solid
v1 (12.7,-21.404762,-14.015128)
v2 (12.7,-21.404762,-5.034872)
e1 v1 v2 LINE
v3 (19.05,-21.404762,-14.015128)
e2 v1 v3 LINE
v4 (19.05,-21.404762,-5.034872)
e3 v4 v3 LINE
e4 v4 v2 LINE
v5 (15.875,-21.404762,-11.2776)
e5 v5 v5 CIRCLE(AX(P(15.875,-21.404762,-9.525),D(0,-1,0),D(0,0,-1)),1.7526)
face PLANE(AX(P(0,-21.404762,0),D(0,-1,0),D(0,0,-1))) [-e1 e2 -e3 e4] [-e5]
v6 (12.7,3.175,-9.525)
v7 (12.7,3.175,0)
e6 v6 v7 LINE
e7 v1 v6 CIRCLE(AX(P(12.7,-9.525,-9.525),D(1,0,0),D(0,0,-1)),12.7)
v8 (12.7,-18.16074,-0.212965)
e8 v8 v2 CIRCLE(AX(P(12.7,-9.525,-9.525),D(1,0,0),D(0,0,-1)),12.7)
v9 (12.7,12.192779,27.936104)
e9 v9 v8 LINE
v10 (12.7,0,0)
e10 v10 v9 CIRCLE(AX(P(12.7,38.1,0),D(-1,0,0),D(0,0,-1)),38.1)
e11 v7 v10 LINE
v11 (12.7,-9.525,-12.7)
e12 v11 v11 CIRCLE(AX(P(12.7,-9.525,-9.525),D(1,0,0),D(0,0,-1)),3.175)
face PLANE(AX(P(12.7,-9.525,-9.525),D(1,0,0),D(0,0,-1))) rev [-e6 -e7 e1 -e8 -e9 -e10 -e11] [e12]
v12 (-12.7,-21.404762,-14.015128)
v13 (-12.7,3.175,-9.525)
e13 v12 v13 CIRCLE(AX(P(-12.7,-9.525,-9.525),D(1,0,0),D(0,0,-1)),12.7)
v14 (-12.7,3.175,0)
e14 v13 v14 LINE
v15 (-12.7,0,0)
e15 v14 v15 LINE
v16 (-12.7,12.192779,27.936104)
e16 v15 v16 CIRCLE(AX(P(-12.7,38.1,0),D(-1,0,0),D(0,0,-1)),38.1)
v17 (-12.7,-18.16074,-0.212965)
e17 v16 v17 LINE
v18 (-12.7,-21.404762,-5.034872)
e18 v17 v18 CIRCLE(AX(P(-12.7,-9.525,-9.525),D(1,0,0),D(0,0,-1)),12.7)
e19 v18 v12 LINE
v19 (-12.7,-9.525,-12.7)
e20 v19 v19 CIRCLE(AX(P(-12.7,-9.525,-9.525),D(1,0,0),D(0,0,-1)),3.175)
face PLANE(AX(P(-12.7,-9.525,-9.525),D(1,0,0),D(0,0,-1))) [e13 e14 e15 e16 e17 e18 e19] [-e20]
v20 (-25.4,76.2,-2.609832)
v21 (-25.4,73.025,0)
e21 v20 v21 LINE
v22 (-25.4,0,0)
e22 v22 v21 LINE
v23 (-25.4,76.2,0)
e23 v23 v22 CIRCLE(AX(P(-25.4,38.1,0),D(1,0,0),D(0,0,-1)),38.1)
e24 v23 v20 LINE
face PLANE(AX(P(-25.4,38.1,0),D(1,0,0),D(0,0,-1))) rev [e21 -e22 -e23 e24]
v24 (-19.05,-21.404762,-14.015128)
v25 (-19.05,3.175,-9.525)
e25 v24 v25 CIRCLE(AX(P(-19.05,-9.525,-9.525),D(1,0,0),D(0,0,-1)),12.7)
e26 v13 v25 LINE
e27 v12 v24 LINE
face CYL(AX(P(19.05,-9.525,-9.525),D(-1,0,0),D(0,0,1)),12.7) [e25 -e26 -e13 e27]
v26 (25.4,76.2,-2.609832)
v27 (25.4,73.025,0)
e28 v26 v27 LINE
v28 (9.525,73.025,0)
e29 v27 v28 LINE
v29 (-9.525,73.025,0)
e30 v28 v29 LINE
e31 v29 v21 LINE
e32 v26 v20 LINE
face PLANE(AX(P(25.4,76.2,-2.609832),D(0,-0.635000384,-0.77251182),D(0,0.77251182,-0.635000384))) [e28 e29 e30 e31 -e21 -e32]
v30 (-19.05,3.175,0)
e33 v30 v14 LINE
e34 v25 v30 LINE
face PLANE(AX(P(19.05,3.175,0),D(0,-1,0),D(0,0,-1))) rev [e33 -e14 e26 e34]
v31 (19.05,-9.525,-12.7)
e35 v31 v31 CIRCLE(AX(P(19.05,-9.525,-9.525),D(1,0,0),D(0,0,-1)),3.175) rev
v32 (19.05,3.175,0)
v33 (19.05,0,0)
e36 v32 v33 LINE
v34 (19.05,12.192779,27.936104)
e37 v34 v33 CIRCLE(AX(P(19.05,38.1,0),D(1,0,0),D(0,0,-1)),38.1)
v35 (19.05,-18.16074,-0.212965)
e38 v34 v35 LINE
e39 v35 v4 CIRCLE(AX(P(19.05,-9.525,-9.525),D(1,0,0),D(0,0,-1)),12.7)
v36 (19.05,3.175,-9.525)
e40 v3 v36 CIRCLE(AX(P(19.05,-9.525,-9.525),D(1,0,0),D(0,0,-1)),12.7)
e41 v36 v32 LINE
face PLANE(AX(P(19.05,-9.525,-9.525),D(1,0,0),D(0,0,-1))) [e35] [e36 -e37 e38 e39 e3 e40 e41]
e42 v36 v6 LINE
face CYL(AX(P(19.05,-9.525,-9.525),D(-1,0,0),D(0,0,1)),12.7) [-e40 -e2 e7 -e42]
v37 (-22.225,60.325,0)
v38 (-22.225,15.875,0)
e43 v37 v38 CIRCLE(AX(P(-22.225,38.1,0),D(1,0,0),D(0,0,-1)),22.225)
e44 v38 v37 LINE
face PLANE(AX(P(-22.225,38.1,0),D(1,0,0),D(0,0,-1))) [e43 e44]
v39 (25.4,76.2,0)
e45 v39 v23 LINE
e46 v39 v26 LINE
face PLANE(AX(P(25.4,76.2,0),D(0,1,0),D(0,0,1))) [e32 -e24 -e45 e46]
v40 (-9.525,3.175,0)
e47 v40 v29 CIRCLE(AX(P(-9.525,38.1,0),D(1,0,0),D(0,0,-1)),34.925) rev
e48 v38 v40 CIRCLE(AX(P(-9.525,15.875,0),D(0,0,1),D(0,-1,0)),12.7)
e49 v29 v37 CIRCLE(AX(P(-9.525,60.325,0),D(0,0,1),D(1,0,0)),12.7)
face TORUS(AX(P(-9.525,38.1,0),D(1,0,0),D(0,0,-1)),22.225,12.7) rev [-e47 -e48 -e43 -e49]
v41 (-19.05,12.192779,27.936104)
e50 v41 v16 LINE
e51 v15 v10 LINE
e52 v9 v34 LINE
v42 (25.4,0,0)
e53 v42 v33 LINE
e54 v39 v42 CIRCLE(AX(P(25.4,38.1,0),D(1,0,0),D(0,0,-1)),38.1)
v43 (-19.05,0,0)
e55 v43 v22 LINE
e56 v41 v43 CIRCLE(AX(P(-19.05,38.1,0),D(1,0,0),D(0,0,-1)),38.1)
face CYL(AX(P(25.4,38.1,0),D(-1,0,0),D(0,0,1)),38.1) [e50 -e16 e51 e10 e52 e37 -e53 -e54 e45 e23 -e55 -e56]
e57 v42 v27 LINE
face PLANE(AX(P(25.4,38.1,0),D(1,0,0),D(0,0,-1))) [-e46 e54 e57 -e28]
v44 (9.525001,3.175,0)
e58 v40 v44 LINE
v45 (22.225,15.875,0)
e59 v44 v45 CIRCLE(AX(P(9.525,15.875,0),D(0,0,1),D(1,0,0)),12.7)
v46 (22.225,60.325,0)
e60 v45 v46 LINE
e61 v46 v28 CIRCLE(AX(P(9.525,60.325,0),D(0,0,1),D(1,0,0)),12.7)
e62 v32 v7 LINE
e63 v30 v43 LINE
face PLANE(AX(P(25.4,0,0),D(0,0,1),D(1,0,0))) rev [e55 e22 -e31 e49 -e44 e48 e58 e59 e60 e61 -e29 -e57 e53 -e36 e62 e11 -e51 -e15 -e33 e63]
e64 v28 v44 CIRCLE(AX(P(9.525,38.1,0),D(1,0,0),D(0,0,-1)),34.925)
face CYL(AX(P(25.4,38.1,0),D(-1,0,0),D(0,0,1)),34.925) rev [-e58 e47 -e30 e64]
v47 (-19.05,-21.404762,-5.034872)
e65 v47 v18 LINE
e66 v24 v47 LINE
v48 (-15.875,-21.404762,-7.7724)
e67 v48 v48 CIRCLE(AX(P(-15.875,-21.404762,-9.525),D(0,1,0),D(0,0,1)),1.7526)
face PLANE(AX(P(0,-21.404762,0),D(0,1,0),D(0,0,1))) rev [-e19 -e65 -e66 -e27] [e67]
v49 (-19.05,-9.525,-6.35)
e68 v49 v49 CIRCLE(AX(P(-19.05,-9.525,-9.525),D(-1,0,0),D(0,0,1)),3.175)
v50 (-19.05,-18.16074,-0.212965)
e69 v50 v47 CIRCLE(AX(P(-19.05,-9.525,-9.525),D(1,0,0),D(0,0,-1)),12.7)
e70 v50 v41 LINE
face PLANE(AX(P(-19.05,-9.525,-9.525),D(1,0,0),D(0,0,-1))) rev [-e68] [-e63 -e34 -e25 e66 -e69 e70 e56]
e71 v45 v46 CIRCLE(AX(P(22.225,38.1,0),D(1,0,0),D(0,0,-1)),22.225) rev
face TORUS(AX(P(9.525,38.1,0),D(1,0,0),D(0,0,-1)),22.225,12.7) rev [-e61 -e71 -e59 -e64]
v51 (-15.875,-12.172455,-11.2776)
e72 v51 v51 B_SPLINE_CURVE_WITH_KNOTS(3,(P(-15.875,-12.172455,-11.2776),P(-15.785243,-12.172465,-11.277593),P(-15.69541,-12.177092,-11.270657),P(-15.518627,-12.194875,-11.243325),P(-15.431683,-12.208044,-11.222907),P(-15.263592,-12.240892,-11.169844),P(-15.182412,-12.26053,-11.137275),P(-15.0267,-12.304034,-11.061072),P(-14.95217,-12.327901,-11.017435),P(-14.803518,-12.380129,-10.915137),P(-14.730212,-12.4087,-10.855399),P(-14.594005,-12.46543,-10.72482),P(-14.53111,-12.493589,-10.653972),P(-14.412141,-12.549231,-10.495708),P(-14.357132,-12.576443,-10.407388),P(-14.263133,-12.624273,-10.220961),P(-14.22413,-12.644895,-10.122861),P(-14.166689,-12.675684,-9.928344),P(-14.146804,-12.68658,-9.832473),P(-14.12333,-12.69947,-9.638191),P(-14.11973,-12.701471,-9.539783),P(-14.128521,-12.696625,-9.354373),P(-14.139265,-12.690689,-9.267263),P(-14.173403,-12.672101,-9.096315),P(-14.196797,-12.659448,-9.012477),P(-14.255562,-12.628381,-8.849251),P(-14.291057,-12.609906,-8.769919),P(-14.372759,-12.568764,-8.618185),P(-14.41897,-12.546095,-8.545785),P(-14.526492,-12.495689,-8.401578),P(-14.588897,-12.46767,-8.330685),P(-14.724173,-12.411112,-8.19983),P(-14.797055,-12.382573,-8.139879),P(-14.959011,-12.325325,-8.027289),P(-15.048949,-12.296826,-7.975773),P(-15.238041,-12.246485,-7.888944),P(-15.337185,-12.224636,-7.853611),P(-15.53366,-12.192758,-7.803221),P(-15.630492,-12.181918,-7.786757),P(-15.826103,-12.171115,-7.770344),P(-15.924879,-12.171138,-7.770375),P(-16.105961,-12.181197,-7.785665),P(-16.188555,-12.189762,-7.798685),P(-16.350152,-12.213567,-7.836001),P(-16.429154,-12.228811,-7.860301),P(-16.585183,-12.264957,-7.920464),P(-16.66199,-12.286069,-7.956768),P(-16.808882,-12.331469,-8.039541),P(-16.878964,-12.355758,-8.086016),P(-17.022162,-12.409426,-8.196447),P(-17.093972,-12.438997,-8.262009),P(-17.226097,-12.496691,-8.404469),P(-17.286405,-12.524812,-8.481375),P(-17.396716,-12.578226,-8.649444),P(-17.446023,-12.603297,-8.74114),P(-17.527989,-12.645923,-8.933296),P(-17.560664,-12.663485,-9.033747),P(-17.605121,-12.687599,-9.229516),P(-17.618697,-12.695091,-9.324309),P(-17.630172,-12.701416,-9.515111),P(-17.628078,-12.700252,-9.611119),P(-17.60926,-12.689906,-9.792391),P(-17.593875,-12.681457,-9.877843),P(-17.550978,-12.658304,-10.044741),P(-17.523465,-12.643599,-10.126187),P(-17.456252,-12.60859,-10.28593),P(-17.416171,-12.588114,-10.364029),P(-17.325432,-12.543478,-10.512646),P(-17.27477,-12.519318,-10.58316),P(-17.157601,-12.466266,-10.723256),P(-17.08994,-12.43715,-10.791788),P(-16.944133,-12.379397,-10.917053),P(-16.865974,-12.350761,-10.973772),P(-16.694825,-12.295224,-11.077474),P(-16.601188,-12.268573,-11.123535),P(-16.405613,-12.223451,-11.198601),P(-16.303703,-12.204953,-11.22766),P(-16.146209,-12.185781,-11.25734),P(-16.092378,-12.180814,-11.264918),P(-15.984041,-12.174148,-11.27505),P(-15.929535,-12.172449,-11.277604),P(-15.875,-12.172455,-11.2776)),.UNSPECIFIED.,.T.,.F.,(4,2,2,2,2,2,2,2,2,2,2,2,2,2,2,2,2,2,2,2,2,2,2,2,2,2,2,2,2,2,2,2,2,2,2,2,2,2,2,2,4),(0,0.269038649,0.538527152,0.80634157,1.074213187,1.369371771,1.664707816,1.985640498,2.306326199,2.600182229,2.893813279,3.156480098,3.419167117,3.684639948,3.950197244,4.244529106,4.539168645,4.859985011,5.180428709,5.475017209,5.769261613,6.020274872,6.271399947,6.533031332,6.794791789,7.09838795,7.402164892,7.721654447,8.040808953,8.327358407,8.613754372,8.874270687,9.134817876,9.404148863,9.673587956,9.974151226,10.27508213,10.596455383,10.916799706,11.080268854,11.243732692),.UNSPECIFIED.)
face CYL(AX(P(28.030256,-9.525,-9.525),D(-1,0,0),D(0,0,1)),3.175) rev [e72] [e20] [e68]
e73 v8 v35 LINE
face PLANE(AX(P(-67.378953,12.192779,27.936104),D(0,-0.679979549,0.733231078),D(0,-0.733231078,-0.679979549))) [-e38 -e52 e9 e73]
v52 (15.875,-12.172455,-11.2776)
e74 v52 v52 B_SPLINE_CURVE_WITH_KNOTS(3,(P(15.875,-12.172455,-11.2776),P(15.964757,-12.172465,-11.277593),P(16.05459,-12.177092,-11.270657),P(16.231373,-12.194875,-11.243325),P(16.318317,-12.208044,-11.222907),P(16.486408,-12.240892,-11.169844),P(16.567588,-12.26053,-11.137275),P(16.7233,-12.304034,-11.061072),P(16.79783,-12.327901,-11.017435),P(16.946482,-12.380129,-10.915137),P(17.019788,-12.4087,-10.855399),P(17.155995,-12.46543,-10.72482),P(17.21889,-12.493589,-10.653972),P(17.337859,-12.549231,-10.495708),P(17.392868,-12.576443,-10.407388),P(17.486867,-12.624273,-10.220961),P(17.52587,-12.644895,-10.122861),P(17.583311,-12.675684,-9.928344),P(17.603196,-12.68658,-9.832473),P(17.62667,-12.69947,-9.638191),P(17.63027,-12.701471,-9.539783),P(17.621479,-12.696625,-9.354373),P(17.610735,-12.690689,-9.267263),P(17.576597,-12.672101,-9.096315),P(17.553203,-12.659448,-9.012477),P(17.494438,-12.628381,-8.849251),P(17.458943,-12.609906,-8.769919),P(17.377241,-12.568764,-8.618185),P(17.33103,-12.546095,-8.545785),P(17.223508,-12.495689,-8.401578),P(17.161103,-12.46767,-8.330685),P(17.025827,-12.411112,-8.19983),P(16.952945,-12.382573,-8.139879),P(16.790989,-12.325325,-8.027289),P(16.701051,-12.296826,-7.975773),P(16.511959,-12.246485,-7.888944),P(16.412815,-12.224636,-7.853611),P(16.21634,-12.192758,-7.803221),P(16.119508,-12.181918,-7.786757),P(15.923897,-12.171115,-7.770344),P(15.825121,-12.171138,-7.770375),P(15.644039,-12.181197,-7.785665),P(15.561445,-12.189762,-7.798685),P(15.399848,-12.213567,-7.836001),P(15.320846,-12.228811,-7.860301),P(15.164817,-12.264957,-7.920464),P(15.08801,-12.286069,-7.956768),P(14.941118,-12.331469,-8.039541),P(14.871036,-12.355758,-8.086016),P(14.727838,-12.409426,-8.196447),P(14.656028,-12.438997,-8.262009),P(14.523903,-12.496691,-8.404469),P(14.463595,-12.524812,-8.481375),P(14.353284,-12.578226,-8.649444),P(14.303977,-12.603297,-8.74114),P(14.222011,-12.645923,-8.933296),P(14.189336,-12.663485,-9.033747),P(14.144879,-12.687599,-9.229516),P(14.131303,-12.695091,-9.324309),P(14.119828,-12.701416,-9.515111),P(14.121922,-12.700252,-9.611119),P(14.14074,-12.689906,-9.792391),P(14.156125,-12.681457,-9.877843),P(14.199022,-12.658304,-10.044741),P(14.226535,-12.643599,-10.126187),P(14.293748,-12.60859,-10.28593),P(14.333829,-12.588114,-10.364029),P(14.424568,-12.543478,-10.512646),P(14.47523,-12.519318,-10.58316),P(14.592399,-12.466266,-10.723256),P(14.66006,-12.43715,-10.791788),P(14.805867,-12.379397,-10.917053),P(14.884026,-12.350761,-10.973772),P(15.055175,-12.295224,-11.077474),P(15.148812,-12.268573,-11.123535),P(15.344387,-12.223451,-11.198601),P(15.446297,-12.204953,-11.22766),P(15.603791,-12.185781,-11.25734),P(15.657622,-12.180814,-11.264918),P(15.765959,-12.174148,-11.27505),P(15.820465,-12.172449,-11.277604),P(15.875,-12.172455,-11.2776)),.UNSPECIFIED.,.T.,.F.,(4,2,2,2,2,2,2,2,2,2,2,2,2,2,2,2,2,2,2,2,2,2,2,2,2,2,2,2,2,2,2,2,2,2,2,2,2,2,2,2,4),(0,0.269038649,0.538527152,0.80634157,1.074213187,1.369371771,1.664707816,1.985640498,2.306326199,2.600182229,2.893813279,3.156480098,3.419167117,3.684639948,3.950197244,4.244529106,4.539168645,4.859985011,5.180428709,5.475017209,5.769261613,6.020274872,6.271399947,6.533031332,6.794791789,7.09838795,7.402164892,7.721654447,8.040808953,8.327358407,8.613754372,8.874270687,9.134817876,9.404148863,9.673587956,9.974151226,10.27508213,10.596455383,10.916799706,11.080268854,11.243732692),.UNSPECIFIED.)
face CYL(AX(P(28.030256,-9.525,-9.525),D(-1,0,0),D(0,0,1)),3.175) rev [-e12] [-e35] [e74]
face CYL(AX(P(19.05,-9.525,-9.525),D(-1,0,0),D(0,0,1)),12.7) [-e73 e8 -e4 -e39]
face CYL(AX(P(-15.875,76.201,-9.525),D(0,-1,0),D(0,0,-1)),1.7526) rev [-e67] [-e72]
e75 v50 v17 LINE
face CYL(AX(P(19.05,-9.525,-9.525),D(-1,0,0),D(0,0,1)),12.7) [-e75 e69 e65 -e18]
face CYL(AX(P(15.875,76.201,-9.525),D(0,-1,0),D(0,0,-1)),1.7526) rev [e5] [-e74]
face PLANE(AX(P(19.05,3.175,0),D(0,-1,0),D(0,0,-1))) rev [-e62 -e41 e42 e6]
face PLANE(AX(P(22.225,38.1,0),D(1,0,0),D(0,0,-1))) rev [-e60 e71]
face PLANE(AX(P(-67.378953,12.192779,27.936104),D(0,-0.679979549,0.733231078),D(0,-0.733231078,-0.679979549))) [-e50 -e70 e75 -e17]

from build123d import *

# Parameters (mm, degrees)
BOSS_EXTRUDE1_DEPTH                 = 25.4
SHELL1_T                            = -3.175
SKETCH4_R                           = 12.7
BOSS_EXTRUDE3_DEPTH                 = 19.05
BOSS_EXTRUDE4_DEPTH                 = 19.05
SKETCH6_R                           = 12.7
CUT_EXTRUDE2_DEPTH                  = 12.7
CUT_EXTRUDE3_START                  = 12.7
SKETCH6_2_R                         = 12.7
CUT_EXTRUDE3_DEPTH                  = 12.7
CUT_EXTRUDE4_REACH                  = 98.093
SKETCH7_R                           = 3.175
BOSS_EXTRUDE5_REACH                 = 98.093
CUT_EXTRUDE5_DEPTH                  = 12.7
BOSS_EXTRUDE6_DEPTH                 = 25.4
FILLET2_R                           = 12.7
CUT_EXTRUDE6_REACH                  = 109.812
CUT_EXTRUDE6_END_RADIUS             = 3.175
SKETCH12_R                          = 1.7526
CUT_EXTRUDE6_DIRECTION_2_REACH      = 109.812
CUT_EXTRUDE6_DIRECTION_2_END_RADIUS = 12.7
CUT_EXTRUDE7_DEPTH                  = 108.812149615


with BuildPart() as part:
    # Sketch2 → Boss-Extrude1 (new, symmetric)
    with BuildSketch(Plane(origin=(0, 0, 0), x_dir=(0, 0, -1), z_dir=(1, 0, 0))):
        with BuildLine():
            Line((0, 0), (0, 76.2))
            ThreePointArc((0, 76.2), (-38.1, 38.1), (0, 0))
        make_face()
    extrude(amount=BOSS_EXTRUDE1_DEPTH, both=True)

    # Shell1
    shell1_openings = [part.faces().sort_by_distance(p)[0] for p in [
        (0, 38.1, 0),
    ]]
    offset(amount=SHELL1_T, openings=shell1_openings)



with BuildPart() as body_2:
    # Sketch4 → Boss-Extrude3 (new, symmetric)
    with BuildSketch(Plane(origin=(0, 0, 0), x_dir=(0, 0, -1), z_dir=(1, 0, 0))):
        with Locations(Location((9.525, -9.525, 0), (0, 0, 180))):
            Circle(SKETCH4_R)
    extrude(amount=BOSS_EXTRUDE3_DEPTH, both=True)


with BuildPart() as part_1:
    add(part.part)

    add(body_2.part)  # Boss-Extrude4 merges body 2
    # Sketch5 → Boss-Extrude4 (add, symmetric)
    with BuildSketch(Plane(origin=(0, 0, 0), x_dir=(0, 0, -1), z_dir=(1, 0, 0))):
        with BuildLine():
            Line((0, 3.175), (0, 0))
            Line((0, 0), (1.124739587, 0))
            ThreePointArc((1.124739587, 0), (5.034871939, 2.354762203), (9.525, 3.175))
            Line((9.525, 3.175), (0, 3.175))
        make_face()
    extrude(amount=BOSS_EXTRUDE4_DEPTH, both=True)

    # Sketch6 → Cut-Extrude2 (cut)
    with BuildSketch(Plane(origin=(0, 0, 0), x_dir=(0, 0, -1), z_dir=(1, 0, 0))):
        with Locations((9.525, -9.525)):
            Circle(SKETCH6_R)
    extrude(amount=-CUT_EXTRUDE2_DEPTH, mode=Mode.SUBTRACT)

    # Sketch6<2> → Cut-Extrude3 (cut)
    with BuildSketch(Plane(origin=(0, 0, 0), x_dir=(0, 0, -1), z_dir=(1, 0, 0)).offset(CUT_EXTRUDE3_START)):
        with Locations((9.525, -9.525)):
            Circle(SKETCH6_2_R)
    extrude(amount=-CUT_EXTRUDE3_DEPTH, mode=Mode.SUBTRACT)

    # Cut-Extrude4: up to this face of the body (flat: up to its plane)
    cut_extrude4_end = Plane(part_1.part.faces().sort_by_distance((25.4, 38.1, 16.170142218))[0])
    # Sketch7 → Cut-Extrude4 (cut, up to the picked face)
    with BuildSketch(Plane.ZY.offset(19.05), mode=Mode.PRIVATE) as cut_extrude4_sk1:
        with Locations(Location((-9.525, -9.525, 0), (0, 0, 180))):
            Circle(SKETCH7_R)
    cut_extrude4_tool1 = split(extrude(cut_extrude4_sk1.sketch, amount=-CUT_EXTRUDE4_REACH, mode=Mode.PRIVATE), bisect_by=cut_extrude4_end, keep=Keep.BOTH, mode=Mode.PRIVATE)
    add(cut_extrude4_tool1.solids().sort_by(Axis((-19.05, -9.525, -9.525), (1, 0, 0)))[0], mode=Mode.SUBTRACT)

    # Boss-Extrude5: up to this face of the body (flat: up to its plane)
    boss_extrude5_end = Plane(part_1.part.faces().sort_by_distance((-19.05, 2.815789755, -4.7625))[0])
    # Sketch8 → Boss-Extrude5 (add, up to the picked face)
    with BuildSketch(Plane(origin=(19.05, 0, 0), x_dir=(0, 0, -1), z_dir=(1, 0, 0)), mode=Mode.PRIVATE) as boss_extrude5_sk1:
        with BuildLine():
            Line((-27.936104056, 12.192779189), (0.212965315, -18.16074027))
            Line((0.212965315, -18.16074027), (5.034871939, -21.404762203))
            Line((5.034871939, -21.404762203), (1.124739587, 0))
            Line((1.124739587, 0), (0, 3.175))
            ThreePointArc((0, 3.175), (-13.704863106, 5.9762961), (-25.211222013, 13.9308066))
            Line((-25.211222013, 13.9308066), (-27.936104056, 12.192779189))
        make_face()
    boss_extrude5_tool1 = split(extrude(boss_extrude5_sk1.sketch, amount=-BOSS_EXTRUDE5_REACH, mode=Mode.PRIVATE), bisect_by=boss_extrude5_end, keep=Keep.BOTH, mode=Mode.PRIVATE)
    add(boss_extrude5_tool1.solids().sort_by(Axis((19.05, -2.840531, 7.724646), (-1, 0, 0)))[0])

    # Sketch9 → Cut-Extrude5 (cut, symmetric)
    with BuildSketch(Plane(origin=(0, 0, 0), x_dir=(0, 0, -1), z_dir=(1, 0, 0))):
        with BuildLine():
            Line((0, 3.175), (0, 0))
            ThreePointArc((0, 0), (-15.240486985, 3.180985746), (-27.936104056, 12.192779189))
            Line((-27.936104056, 12.192779189), (0.212965315, -18.16074027))
            ThreePointArc((0.212965315, -18.16074027), (21.164671418, -14.605162328), (9.525, 3.175))
            Line((9.525, 3.175), (0, 3.175))
        make_face()
    extrude(amount=CUT_EXTRUDE5_DEPTH, both=True, mode=Mode.SUBTRACT)

    # Sketch11 → Boss-Extrude6 (add, symmetric)
    with BuildSketch(Plane(origin=(0, 0, 0), x_dir=(0, 0, -1), z_dir=(1, 0, 0))):
        Polygon((2.609832197, 76.2), (0, 76.2), (0, 73.025), align=None)
    extrude(amount=BOSS_EXTRUDE6_DEPTH, both=True)

    # Fillet2
    # the kernel refuses this fillet: 12.7 mm, written as the material it adds along each edge
    with BuildSketch(Plane(origin=(-22.225, 38.1, 0), x_dir=(0, 1, 0), z_dir=(0, 0, -1))) as fillet2_piece_1:
        with BuildLine():
            CenterArc((34.925 - FILLET2_R, FILLET2_R), FILLET2_R, 270, 90)
            Line((34.925 - FILLET2_R, 0), (34.925, 0))
            Line((34.925, 0), (34.925, FILLET2_R))
        make_face()
    revolve(axis=Axis((-22.225, 38.1, 0), (1, 0, 0)), revolution_arc=180)
    with BuildSketch(Plane(origin=(22.225, 38.1, 0), x_dir=(0, 1, 0), z_dir=(0, 0, -1))) as fillet2_piece_2:
        with BuildLine():
            CenterArc((34.925 - FILLET2_R, -FILLET2_R), FILLET2_R, 0, 90)
            Line((34.925 - FILLET2_R, 0), (34.925, 0))
            Line((34.925, 0), (34.925, -FILLET2_R))
        make_face()
    revolve(axis=Axis((22.225, 38.1, 0), (1, 0, 0)), revolution_arc=180)

    # Cut-Extrude6: up to this cylinder (the profile starts outside it)
    cut_extrude6_end = Plane(origin=(0, -9.525, -9.525), z_dir=(-1, 0, 0)) * Cylinder(CUT_EXTRUDE6_END_RADIUS, 258.724, mode=Mode.PRIVATE)
    # Sketch12 → Cut-Extrude6 (cut, up to the surface)
    with BuildSketch(Plane(origin=(0, -21.404762203, 0), x_dir=(1, 0, 0), z_dir=(0, 1, 0)), mode=Mode.PRIVATE) as cut_extrude6_sk1:
        with Locations(Location((15.875, 9.525, 0), (0, 0, 90))):
            Circle(SKETCH12_R)
    cut_extrude6_tool1 = extrude(cut_extrude6_sk1.sketch, amount=CUT_EXTRUDE6_REACH, mode=Mode.PRIVATE) - cut_extrude6_end
    add(cut_extrude6_tool1.solids().sort_by_distance((15.875, -21.404762, -9.525))[0], mode=Mode.SUBTRACT)
    # Sketch12 → Cut-Extrude6 (cut, up to the surface)
    with BuildSketch(Plane(origin=(0, -21.404762203, 0), x_dir=(1, 0, 0), z_dir=(0, 1, 0)), mode=Mode.PRIVATE) as cut_extrude6_sk2:
        with Locations(Location((-15.875, 9.525, 0), (0, 0, 90))):
            Circle(SKETCH12_R)
    cut_extrude6_tool2 = extrude(cut_extrude6_sk2.sketch, amount=CUT_EXTRUDE6_REACH, mode=Mode.PRIVATE) - cut_extrude6_end
    add(cut_extrude6_tool2.solids().sort_by_distance((-15.875, -21.404762, -9.525))[0], mode=Mode.SUBTRACT)

    # Cut-Extrude6 direction 2: up to this cylinder (the profile starts inside it)
    cut_extrude6_direction_2_end = Plane(origin=(0, -9.525, -9.525), z_dir=(-1, 0, 0)) * Cylinder(CUT_EXTRUDE6_DIRECTION_2_END_RADIUS, 277.774, mode=Mode.PRIVATE)
    # Sketch12 → Cut-Extrude6 direction 2 (cut, up to the surface)
    with BuildSketch(Plane(origin=(0, -21.404762203, 0), x_dir=(1, 0, 0), z_dir=(0, 1, 0)), mode=Mode.PRIVATE) as cut_extrude6_direction_2_sk1:
        with Locations(Location((15.875, 9.525, 0), (0, 0, 90))):
            Circle(SKETCH12_R)
    cut_extrude6_direction_2_tool1 = extrude(cut_extrude6_direction_2_sk1.sketch, amount=-CUT_EXTRUDE6_DIRECTION_2_REACH, mode=Mode.PRIVATE) & cut_extrude6_direction_2_end
    add(cut_extrude6_direction_2_tool1.solids().sort_by_distance((15.875, -21.404762, -9.525))[0], mode=Mode.SUBTRACT)
    # Sketch12 → Cut-Extrude6 direction 2 (cut, up to the surface)
    with BuildSketch(Plane(origin=(0, -21.404762203, 0), x_dir=(1, 0, 0), z_dir=(0, 1, 0)), mode=Mode.PRIVATE) as cut_extrude6_direction_2_sk2:
        with Locations(Location((-15.875, 9.525, 0), (0, 0, 90))):
            Circle(SKETCH12_R)
    cut_extrude6_direction_2_tool2 = extrude(cut_extrude6_direction_2_sk2.sketch, amount=-CUT_EXTRUDE6_DIRECTION_2_REACH, mode=Mode.PRIVATE) & cut_extrude6_direction_2_end
    add(cut_extrude6_direction_2_tool2.solids().sort_by_distance((-15.875, -21.404762, -9.525))[0], mode=Mode.SUBTRACT)

    # Sketch13 → Cut-Extrude7 (cut, through all)
    with BuildSketch(Plane(origin=(0, -21.404762203, 0), x_dir=(1, 0, 0), z_dir=(0, 1, 0))):
        Polygon((19.05, 15.875), (12.7, 15.875), (12.7, 10.397684257), (12.7, 3.175), (19.05, 3.175), align=None)
        Polygon((-19.05, 15.875), (-12.7, 15.875), (-12.7, 10.397684257), (-12.7, 3.175), (-19.05, 3.175), align=None)
    extrude(amount=-CUT_EXTRUDE7_DEPTH, mode=Mode.SUBTRACT)


solid = part_1.part
